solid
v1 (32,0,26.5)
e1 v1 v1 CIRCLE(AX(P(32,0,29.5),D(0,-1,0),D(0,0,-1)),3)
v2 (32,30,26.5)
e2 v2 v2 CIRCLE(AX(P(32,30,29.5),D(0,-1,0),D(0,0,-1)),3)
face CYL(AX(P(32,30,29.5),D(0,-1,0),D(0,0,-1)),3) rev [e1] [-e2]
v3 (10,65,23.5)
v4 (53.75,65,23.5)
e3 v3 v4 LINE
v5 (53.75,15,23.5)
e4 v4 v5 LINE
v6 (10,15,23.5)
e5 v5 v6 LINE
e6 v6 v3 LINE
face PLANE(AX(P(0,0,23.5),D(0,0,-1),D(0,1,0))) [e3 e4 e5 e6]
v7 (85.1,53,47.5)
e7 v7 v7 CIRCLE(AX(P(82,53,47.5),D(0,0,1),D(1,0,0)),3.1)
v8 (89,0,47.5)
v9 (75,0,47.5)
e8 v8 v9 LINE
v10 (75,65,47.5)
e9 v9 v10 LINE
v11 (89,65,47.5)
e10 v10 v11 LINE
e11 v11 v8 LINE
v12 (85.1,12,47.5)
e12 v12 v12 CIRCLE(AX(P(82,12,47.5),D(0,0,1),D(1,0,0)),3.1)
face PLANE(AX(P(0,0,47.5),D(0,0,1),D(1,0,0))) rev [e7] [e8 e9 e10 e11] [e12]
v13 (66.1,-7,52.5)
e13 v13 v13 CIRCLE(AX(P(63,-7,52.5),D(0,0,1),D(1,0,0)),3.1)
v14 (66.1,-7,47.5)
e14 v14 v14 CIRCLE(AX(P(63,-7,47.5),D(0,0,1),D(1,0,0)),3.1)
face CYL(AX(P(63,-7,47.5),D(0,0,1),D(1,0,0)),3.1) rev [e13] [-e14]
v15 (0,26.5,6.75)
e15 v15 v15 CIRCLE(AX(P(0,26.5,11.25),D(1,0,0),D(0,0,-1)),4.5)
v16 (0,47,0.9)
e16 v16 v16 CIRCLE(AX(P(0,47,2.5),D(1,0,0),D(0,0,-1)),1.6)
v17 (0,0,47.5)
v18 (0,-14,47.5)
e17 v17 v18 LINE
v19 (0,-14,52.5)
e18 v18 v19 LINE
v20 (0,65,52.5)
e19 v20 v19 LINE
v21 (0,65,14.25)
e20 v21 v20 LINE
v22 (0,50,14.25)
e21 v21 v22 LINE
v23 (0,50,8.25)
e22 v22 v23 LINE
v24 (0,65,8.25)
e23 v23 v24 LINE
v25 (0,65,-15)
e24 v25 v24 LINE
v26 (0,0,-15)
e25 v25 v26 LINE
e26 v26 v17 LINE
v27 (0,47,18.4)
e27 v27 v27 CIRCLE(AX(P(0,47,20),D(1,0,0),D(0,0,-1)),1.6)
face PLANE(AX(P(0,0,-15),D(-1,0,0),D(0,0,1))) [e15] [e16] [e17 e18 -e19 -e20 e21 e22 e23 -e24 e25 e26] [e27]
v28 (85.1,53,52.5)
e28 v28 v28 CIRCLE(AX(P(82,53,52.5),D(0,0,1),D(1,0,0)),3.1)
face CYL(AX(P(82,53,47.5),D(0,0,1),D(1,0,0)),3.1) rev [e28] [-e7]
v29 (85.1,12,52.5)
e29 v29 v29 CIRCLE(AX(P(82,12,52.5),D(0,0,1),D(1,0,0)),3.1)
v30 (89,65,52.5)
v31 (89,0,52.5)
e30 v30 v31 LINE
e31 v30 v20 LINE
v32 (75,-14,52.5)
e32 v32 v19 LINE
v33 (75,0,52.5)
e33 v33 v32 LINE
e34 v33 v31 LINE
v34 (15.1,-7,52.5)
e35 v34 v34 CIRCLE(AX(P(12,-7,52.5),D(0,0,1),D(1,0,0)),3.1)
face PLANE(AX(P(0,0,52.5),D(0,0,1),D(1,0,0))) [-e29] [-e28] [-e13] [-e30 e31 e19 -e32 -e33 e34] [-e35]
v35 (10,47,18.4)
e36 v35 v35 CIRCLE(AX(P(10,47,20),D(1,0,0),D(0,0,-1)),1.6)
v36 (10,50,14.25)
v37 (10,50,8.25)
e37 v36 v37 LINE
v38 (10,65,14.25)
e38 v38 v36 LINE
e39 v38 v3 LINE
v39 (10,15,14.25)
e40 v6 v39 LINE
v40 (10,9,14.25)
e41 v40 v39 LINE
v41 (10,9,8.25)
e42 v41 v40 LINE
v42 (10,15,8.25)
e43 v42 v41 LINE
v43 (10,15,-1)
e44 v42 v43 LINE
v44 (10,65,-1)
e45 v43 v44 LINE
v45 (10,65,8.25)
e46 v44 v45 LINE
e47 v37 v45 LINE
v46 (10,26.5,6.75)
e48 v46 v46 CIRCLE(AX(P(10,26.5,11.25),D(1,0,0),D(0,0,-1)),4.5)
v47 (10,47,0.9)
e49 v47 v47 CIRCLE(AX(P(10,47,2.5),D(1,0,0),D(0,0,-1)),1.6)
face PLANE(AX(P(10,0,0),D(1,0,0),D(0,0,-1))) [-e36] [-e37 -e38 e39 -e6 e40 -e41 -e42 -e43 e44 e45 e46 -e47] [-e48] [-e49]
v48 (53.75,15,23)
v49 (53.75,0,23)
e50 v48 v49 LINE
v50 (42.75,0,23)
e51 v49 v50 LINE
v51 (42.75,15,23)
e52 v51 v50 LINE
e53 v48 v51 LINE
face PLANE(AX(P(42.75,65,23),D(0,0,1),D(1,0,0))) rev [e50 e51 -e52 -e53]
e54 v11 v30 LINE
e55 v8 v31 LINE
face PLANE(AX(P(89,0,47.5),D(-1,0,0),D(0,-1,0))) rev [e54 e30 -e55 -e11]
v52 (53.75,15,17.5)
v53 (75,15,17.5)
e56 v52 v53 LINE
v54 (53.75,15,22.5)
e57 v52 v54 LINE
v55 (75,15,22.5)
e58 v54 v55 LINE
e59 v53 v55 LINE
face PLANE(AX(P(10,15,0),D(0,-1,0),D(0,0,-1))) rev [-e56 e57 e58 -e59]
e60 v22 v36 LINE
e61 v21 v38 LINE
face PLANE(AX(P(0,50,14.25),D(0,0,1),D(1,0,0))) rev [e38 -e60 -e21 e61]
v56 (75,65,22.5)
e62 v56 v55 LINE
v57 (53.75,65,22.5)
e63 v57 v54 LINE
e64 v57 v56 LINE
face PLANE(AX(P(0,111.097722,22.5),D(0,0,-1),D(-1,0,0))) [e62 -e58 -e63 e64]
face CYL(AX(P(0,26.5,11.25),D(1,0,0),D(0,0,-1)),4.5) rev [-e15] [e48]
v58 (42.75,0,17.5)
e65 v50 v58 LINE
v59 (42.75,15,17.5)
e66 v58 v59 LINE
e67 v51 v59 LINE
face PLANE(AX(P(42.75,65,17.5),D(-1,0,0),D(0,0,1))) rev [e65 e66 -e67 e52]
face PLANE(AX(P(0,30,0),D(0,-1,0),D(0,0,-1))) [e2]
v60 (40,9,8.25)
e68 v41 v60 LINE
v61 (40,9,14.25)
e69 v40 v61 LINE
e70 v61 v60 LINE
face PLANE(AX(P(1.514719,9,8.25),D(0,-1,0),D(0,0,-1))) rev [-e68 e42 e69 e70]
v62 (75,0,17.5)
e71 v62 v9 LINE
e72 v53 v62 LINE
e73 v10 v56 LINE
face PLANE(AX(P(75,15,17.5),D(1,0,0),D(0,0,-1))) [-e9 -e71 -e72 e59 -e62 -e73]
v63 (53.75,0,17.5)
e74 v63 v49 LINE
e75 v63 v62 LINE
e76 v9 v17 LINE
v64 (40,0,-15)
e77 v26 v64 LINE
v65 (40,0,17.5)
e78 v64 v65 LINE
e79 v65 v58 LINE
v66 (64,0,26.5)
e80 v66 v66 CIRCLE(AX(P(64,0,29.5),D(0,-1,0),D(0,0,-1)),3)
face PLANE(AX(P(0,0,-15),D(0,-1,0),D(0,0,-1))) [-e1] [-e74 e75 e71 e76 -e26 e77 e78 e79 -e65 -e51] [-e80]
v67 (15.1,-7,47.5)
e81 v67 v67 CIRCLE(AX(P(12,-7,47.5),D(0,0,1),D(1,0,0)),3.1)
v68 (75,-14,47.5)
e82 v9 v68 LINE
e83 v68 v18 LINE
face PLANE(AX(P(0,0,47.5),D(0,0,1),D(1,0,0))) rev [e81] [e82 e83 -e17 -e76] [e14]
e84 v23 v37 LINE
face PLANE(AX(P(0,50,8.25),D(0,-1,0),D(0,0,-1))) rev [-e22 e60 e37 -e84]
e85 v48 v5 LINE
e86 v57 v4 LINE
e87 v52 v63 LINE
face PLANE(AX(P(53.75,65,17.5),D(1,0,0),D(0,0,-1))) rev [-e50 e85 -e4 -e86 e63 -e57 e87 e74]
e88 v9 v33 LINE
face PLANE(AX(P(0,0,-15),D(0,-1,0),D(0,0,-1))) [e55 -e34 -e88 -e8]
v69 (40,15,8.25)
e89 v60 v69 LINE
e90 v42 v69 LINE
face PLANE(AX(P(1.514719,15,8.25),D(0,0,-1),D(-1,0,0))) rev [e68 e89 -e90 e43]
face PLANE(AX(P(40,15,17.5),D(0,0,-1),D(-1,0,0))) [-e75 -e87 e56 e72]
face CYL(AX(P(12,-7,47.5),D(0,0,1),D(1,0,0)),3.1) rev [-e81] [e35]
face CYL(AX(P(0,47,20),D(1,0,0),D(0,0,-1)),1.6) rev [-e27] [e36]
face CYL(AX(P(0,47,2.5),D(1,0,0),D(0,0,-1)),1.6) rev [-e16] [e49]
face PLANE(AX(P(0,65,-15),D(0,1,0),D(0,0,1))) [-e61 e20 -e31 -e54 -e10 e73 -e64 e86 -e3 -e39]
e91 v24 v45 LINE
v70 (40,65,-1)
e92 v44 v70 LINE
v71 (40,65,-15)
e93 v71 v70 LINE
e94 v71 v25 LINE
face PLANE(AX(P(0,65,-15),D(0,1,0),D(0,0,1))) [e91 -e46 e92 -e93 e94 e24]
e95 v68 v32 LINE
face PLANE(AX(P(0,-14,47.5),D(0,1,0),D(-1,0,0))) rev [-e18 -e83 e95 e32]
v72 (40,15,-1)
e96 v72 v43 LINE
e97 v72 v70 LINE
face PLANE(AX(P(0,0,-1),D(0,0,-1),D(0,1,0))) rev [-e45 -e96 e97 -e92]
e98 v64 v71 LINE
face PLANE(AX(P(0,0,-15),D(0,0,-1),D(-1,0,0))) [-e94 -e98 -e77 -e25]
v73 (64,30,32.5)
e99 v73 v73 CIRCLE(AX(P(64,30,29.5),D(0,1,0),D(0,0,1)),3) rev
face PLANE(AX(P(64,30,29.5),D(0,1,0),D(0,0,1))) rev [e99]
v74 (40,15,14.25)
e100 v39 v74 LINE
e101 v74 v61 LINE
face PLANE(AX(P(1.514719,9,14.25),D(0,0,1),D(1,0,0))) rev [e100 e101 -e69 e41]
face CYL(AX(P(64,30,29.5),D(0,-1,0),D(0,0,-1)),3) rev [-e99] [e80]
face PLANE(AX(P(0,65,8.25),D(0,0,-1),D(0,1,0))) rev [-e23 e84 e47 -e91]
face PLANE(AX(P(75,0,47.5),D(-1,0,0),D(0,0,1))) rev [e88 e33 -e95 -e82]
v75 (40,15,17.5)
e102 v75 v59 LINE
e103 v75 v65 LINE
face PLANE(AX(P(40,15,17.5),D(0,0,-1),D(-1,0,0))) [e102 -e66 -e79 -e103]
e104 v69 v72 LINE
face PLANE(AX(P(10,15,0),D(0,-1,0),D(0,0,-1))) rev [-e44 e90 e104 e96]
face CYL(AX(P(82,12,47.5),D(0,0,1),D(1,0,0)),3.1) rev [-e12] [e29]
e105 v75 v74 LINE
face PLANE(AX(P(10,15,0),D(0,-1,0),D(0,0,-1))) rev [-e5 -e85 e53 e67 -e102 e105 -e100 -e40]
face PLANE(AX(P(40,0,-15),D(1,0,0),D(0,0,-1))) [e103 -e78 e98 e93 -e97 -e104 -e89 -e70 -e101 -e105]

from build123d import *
from build123d.topology import SkipClean

# Parameters (mm, degrees)
BOSS_EXTRUDE1_DEPTH      = 42.5
BOSS_EXTRUDE1_DEPTH_BACK = 15
SKETCH1_W                = 40
SKETCH1_H                = 65
SKETCH3_W                = 22.5
SKETCH3_H                = 50
CUT_EXTRUDE2_DEPTH       = 30
SKETCH4_R                = 4.5
CUT_EXTRUDE3_DEPTH       = 10
SKETCH5_W                = 35
SKETCH5_H                = 25
BOSS_EXTRUDE3_DEPTH      = 15
SKETCH6_R                = 3
CUT_EXTRUDE4_DEPTH       = 30
CUT_EXTRUDE5_DEPTH       = 108.964114408
BOSS_EXTRUDE4_DEPTH      = 10
BOSS_EXTRUDE5_OUTLINE_R  = 3
BOSS_EXTRUDE5_DEPTH      = 50
BOSS_EXTRUDE6_START      = -35
SKETCH11_R               = 3
BOSS_EXTRUDE6_DEPTH      = 35
SKETCH12_W               = 14
SKETCH12_H               = 65
SKETCH12_R               = 3.1
SKETCH12_W_2             = 75
SKETCH12_H_2             = 14
BOSS_EXTRUDE7_DEPTH      = 5
SKETCH13_R               = 1.6
CUT_EXTRUDE6_DEPTH       = 115.988042857
CUT_EXTRUDE7_DEPTH       = 12.25
CUT_EXTRUDE7_DEPTH_BACK  = 12.25
SKETCH14_W               = 43.75
SKETCH14_H               = 50
CUT_EXTRUDE8_DEPTH       = 30
CUT_EXTRUDE9_DEPTH       = 115.988042857


# Read off the part's stored shape, not the designer's step: Boss-Extrude5
with BuildPart() as part:
    # Sketch1 → Boss-Extrude1 (new, two sides: drawn at the far end of the back side and taken through both)
    with BuildSketch(Plane.XY.offset(-BOSS_EXTRUDE1_DEPTH_BACK)):
        with Locations((20, 32.5)):
            Rectangle(SKETCH1_W, SKETCH1_H)
    extrude(amount=BOSS_EXTRUDE1_DEPTH + BOSS_EXTRUDE1_DEPTH_BACK)

    # Sketch3 → Cut-Extrude2 (cut)
    with BuildSketch(Plane(origin=(40, 0, 0), x_dir=(0, 0, -1), z_dir=(1, 0, 0))):
        with Locations((-11.25, 40)):
            Rectangle(SKETCH3_W, SKETCH3_H)
    extrude(amount=-CUT_EXTRUDE2_DEPTH, mode=Mode.SUBTRACT)

    # Sketch4 → Cut-Extrude3 (cut)
    with BuildSketch(Plane(origin=(10, 0, 0), x_dir=(0, 0, -1), z_dir=(1, 0, 0))):
        with Locations((-11.25, 26.5)):
            Circle(SKETCH4_R)
    extrude(amount=-CUT_EXTRUDE3_DEPTH, mode=Mode.SUBTRACT)

    # Sketch5 → Boss-Extrude3 (add)
    with BuildSketch(Plane.XZ):
        with Locations((57.5, 30)):
            Rectangle(SKETCH5_W, SKETCH5_H)
    extrude(amount=-BOSS_EXTRUDE3_DEPTH)

    # Sketch6 → Cut-Extrude4 (cut)
    with BuildSketch(Plane.XZ):
        with Locations(Location((32, 29.5, 0), (0, 0, 270))):
            Circle(SKETCH6_R)
        with Locations(Location((64, 29.5, 0), (0, 0, 270))):
            Circle(SKETCH6_R)
    extrude(amount=-CUT_EXTRUDE4_DEPTH, mode=Mode.SUBTRACT)

    # Sketch8 → Cut-Extrude5 (cut, through all)
    with BuildSketch(Plane.XZ):
        Polygon((48.25, 17.5), (42.75, 17.5), (42.75, 23), (53.75, 23), (53.75, 17.5), align=None)
    extrude(amount=-CUT_EXTRUDE5_DEPTH, mode=Mode.SUBTRACT)

    # Sketch9 → Boss-Extrude4 (add)
    with BuildSketch(Plane.XY.offset(42.5)):
        Polygon((0, 65), (0, 0), (75, 0), (75, 15), (40, 15), (40, 65), align=None)
    extrude(amount=BOSS_EXTRUDE4_DEPTH)

    # Boss-Extrude5 outline → Boss-Extrude5 (add)
    with SkipClean():  # the faces are left unmerged after this step: merging them gives an invalid solid
        with BuildSketch(Plane(origin=(0, 15, 0), x_dir=(1, 0, 0), z_dir=(0, 1, 0))):
            Polygon((75, -52.5), (75, -22.5), (53.75, -22.5), (53.75, -23), (42.75, -23), (42.75, -22.5), (40, -22.5), (40, -52.5), align=None)
            with Locations((64, -29.5)):
                Circle(BOSS_EXTRUDE5_OUTLINE_R, mode=Mode.SUBTRACT)
        extrude(amount=BOSS_EXTRUDE5_DEPTH)

    # Sketch11 → Boss-Extrude6 (add)
    with SkipClean():  # the faces are left unmerged after this step: merging them gives an invalid solid
        with BuildSketch(Plane(origin=(0, 65, 0), x_dir=(1, 0, 0), z_dir=(0, 1, 0)).offset(BOSS_EXTRUDE6_START)):
            with Locations(Location((64, -29.5, 0), (0, 0, 90))):
                Circle(SKETCH11_R)
        extrude(amount=BOSS_EXTRUDE6_DEPTH)

    # Sketch12 → Boss-Extrude7 (add)
    # profile 1 of 2: a face of its own
    with SkipClean():  # the faces are left unmerged after this step: merging them gives an invalid solid
        with BuildSketch(Plane.XY.offset(52.5)):
            with Locations((82, 32.5)):
                Rectangle(SKETCH12_W, SKETCH12_H)
            with Locations((82, 53)):
                Circle(SKETCH12_R, mode=Mode.SUBTRACT)
            with Locations((82, 12)):
                Circle(SKETCH12_R, mode=Mode.SUBTRACT)
        # profile 2 of 2: a face of its own
        with BuildSketch(Plane.XY.offset(52.5)):
            with Locations((37.5, -7)):
                Rectangle(SKETCH12_W_2, SKETCH12_H_2)
            with Locations((12, -7)):
                Circle(SKETCH12_R, mode=Mode.SUBTRACT)
            with Locations((63, -7)):
                Circle(SKETCH12_R, mode=Mode.SUBTRACT)
        extrude(amount=-BOSS_EXTRUDE7_DEPTH)

    # Sketch13 → Cut-Extrude6 (cut, through all)
    with SkipClean():  # the faces are left unmerged after this step: merging them gives an invalid solid
        with BuildSketch(Plane(origin=(10, 0, 0), x_dir=(0, 0, -1), z_dir=(1, 0, 0))):
            with Locations((-2.5, 47)):
                Circle(SKETCH13_R)
            with Locations((-20, 47)):
                Circle(SKETCH13_R)
        extrude(amount=-CUT_EXTRUDE6_DEPTH, mode=Mode.SUBTRACT)

    # Sketch14 → Cut-Extrude7 (cut, two sides: drawn at the far end of the back side and taken through both)
    with SkipClean():  # the faces are left unmerged after this step: merging them gives an invalid solid
        with BuildSketch(Plane(origin=(0, 0, 11.25), x_dir=(-1, 0, 0), z_dir=(0, 0, -1)).offset(-CUT_EXTRUDE7_DEPTH_BACK)):
            with Locations((-31.875, 40)):
                Rectangle(SKETCH14_W, SKETCH14_H)
        extrude(amount=CUT_EXTRUDE7_DEPTH + CUT_EXTRUDE7_DEPTH_BACK, mode=Mode.SUBTRACT)

    # Sketch15 → Cut-Extrude8 (cut)
    with SkipClean():  # the faces are left unmerged after this step: merging them gives an invalid solid
        with BuildSketch(Plane(origin=(40, 0, 0), x_dir=(0, 0, -1), z_dir=(1, 0, 0))):
            Polygon((-11.25, 15), (-8.25, 15), (-8.25, 9), (-14.25, 9), (-14.25, 15), align=None)
        extrude(amount=-CUT_EXTRUDE8_DEPTH, mode=Mode.SUBTRACT)

    # Sketch16 → Cut-Extrude9 (cut, through all)
    with SkipClean():  # the faces are left unmerged after this step: merging them gives an invalid solid
        with BuildSketch(Plane(origin=(10, 0, 0), x_dir=(0, 0, -1), z_dir=(1, 0, 0))):
            Polygon((-11.25, 65), (-8.25, 65), (-8.25, 50), (-14.25, 50), (-14.25, 65), align=None)
        extrude(amount=-CUT_EXTRUDE9_DEPTH, mode=Mode.SUBTRACT)


solid = part.part
